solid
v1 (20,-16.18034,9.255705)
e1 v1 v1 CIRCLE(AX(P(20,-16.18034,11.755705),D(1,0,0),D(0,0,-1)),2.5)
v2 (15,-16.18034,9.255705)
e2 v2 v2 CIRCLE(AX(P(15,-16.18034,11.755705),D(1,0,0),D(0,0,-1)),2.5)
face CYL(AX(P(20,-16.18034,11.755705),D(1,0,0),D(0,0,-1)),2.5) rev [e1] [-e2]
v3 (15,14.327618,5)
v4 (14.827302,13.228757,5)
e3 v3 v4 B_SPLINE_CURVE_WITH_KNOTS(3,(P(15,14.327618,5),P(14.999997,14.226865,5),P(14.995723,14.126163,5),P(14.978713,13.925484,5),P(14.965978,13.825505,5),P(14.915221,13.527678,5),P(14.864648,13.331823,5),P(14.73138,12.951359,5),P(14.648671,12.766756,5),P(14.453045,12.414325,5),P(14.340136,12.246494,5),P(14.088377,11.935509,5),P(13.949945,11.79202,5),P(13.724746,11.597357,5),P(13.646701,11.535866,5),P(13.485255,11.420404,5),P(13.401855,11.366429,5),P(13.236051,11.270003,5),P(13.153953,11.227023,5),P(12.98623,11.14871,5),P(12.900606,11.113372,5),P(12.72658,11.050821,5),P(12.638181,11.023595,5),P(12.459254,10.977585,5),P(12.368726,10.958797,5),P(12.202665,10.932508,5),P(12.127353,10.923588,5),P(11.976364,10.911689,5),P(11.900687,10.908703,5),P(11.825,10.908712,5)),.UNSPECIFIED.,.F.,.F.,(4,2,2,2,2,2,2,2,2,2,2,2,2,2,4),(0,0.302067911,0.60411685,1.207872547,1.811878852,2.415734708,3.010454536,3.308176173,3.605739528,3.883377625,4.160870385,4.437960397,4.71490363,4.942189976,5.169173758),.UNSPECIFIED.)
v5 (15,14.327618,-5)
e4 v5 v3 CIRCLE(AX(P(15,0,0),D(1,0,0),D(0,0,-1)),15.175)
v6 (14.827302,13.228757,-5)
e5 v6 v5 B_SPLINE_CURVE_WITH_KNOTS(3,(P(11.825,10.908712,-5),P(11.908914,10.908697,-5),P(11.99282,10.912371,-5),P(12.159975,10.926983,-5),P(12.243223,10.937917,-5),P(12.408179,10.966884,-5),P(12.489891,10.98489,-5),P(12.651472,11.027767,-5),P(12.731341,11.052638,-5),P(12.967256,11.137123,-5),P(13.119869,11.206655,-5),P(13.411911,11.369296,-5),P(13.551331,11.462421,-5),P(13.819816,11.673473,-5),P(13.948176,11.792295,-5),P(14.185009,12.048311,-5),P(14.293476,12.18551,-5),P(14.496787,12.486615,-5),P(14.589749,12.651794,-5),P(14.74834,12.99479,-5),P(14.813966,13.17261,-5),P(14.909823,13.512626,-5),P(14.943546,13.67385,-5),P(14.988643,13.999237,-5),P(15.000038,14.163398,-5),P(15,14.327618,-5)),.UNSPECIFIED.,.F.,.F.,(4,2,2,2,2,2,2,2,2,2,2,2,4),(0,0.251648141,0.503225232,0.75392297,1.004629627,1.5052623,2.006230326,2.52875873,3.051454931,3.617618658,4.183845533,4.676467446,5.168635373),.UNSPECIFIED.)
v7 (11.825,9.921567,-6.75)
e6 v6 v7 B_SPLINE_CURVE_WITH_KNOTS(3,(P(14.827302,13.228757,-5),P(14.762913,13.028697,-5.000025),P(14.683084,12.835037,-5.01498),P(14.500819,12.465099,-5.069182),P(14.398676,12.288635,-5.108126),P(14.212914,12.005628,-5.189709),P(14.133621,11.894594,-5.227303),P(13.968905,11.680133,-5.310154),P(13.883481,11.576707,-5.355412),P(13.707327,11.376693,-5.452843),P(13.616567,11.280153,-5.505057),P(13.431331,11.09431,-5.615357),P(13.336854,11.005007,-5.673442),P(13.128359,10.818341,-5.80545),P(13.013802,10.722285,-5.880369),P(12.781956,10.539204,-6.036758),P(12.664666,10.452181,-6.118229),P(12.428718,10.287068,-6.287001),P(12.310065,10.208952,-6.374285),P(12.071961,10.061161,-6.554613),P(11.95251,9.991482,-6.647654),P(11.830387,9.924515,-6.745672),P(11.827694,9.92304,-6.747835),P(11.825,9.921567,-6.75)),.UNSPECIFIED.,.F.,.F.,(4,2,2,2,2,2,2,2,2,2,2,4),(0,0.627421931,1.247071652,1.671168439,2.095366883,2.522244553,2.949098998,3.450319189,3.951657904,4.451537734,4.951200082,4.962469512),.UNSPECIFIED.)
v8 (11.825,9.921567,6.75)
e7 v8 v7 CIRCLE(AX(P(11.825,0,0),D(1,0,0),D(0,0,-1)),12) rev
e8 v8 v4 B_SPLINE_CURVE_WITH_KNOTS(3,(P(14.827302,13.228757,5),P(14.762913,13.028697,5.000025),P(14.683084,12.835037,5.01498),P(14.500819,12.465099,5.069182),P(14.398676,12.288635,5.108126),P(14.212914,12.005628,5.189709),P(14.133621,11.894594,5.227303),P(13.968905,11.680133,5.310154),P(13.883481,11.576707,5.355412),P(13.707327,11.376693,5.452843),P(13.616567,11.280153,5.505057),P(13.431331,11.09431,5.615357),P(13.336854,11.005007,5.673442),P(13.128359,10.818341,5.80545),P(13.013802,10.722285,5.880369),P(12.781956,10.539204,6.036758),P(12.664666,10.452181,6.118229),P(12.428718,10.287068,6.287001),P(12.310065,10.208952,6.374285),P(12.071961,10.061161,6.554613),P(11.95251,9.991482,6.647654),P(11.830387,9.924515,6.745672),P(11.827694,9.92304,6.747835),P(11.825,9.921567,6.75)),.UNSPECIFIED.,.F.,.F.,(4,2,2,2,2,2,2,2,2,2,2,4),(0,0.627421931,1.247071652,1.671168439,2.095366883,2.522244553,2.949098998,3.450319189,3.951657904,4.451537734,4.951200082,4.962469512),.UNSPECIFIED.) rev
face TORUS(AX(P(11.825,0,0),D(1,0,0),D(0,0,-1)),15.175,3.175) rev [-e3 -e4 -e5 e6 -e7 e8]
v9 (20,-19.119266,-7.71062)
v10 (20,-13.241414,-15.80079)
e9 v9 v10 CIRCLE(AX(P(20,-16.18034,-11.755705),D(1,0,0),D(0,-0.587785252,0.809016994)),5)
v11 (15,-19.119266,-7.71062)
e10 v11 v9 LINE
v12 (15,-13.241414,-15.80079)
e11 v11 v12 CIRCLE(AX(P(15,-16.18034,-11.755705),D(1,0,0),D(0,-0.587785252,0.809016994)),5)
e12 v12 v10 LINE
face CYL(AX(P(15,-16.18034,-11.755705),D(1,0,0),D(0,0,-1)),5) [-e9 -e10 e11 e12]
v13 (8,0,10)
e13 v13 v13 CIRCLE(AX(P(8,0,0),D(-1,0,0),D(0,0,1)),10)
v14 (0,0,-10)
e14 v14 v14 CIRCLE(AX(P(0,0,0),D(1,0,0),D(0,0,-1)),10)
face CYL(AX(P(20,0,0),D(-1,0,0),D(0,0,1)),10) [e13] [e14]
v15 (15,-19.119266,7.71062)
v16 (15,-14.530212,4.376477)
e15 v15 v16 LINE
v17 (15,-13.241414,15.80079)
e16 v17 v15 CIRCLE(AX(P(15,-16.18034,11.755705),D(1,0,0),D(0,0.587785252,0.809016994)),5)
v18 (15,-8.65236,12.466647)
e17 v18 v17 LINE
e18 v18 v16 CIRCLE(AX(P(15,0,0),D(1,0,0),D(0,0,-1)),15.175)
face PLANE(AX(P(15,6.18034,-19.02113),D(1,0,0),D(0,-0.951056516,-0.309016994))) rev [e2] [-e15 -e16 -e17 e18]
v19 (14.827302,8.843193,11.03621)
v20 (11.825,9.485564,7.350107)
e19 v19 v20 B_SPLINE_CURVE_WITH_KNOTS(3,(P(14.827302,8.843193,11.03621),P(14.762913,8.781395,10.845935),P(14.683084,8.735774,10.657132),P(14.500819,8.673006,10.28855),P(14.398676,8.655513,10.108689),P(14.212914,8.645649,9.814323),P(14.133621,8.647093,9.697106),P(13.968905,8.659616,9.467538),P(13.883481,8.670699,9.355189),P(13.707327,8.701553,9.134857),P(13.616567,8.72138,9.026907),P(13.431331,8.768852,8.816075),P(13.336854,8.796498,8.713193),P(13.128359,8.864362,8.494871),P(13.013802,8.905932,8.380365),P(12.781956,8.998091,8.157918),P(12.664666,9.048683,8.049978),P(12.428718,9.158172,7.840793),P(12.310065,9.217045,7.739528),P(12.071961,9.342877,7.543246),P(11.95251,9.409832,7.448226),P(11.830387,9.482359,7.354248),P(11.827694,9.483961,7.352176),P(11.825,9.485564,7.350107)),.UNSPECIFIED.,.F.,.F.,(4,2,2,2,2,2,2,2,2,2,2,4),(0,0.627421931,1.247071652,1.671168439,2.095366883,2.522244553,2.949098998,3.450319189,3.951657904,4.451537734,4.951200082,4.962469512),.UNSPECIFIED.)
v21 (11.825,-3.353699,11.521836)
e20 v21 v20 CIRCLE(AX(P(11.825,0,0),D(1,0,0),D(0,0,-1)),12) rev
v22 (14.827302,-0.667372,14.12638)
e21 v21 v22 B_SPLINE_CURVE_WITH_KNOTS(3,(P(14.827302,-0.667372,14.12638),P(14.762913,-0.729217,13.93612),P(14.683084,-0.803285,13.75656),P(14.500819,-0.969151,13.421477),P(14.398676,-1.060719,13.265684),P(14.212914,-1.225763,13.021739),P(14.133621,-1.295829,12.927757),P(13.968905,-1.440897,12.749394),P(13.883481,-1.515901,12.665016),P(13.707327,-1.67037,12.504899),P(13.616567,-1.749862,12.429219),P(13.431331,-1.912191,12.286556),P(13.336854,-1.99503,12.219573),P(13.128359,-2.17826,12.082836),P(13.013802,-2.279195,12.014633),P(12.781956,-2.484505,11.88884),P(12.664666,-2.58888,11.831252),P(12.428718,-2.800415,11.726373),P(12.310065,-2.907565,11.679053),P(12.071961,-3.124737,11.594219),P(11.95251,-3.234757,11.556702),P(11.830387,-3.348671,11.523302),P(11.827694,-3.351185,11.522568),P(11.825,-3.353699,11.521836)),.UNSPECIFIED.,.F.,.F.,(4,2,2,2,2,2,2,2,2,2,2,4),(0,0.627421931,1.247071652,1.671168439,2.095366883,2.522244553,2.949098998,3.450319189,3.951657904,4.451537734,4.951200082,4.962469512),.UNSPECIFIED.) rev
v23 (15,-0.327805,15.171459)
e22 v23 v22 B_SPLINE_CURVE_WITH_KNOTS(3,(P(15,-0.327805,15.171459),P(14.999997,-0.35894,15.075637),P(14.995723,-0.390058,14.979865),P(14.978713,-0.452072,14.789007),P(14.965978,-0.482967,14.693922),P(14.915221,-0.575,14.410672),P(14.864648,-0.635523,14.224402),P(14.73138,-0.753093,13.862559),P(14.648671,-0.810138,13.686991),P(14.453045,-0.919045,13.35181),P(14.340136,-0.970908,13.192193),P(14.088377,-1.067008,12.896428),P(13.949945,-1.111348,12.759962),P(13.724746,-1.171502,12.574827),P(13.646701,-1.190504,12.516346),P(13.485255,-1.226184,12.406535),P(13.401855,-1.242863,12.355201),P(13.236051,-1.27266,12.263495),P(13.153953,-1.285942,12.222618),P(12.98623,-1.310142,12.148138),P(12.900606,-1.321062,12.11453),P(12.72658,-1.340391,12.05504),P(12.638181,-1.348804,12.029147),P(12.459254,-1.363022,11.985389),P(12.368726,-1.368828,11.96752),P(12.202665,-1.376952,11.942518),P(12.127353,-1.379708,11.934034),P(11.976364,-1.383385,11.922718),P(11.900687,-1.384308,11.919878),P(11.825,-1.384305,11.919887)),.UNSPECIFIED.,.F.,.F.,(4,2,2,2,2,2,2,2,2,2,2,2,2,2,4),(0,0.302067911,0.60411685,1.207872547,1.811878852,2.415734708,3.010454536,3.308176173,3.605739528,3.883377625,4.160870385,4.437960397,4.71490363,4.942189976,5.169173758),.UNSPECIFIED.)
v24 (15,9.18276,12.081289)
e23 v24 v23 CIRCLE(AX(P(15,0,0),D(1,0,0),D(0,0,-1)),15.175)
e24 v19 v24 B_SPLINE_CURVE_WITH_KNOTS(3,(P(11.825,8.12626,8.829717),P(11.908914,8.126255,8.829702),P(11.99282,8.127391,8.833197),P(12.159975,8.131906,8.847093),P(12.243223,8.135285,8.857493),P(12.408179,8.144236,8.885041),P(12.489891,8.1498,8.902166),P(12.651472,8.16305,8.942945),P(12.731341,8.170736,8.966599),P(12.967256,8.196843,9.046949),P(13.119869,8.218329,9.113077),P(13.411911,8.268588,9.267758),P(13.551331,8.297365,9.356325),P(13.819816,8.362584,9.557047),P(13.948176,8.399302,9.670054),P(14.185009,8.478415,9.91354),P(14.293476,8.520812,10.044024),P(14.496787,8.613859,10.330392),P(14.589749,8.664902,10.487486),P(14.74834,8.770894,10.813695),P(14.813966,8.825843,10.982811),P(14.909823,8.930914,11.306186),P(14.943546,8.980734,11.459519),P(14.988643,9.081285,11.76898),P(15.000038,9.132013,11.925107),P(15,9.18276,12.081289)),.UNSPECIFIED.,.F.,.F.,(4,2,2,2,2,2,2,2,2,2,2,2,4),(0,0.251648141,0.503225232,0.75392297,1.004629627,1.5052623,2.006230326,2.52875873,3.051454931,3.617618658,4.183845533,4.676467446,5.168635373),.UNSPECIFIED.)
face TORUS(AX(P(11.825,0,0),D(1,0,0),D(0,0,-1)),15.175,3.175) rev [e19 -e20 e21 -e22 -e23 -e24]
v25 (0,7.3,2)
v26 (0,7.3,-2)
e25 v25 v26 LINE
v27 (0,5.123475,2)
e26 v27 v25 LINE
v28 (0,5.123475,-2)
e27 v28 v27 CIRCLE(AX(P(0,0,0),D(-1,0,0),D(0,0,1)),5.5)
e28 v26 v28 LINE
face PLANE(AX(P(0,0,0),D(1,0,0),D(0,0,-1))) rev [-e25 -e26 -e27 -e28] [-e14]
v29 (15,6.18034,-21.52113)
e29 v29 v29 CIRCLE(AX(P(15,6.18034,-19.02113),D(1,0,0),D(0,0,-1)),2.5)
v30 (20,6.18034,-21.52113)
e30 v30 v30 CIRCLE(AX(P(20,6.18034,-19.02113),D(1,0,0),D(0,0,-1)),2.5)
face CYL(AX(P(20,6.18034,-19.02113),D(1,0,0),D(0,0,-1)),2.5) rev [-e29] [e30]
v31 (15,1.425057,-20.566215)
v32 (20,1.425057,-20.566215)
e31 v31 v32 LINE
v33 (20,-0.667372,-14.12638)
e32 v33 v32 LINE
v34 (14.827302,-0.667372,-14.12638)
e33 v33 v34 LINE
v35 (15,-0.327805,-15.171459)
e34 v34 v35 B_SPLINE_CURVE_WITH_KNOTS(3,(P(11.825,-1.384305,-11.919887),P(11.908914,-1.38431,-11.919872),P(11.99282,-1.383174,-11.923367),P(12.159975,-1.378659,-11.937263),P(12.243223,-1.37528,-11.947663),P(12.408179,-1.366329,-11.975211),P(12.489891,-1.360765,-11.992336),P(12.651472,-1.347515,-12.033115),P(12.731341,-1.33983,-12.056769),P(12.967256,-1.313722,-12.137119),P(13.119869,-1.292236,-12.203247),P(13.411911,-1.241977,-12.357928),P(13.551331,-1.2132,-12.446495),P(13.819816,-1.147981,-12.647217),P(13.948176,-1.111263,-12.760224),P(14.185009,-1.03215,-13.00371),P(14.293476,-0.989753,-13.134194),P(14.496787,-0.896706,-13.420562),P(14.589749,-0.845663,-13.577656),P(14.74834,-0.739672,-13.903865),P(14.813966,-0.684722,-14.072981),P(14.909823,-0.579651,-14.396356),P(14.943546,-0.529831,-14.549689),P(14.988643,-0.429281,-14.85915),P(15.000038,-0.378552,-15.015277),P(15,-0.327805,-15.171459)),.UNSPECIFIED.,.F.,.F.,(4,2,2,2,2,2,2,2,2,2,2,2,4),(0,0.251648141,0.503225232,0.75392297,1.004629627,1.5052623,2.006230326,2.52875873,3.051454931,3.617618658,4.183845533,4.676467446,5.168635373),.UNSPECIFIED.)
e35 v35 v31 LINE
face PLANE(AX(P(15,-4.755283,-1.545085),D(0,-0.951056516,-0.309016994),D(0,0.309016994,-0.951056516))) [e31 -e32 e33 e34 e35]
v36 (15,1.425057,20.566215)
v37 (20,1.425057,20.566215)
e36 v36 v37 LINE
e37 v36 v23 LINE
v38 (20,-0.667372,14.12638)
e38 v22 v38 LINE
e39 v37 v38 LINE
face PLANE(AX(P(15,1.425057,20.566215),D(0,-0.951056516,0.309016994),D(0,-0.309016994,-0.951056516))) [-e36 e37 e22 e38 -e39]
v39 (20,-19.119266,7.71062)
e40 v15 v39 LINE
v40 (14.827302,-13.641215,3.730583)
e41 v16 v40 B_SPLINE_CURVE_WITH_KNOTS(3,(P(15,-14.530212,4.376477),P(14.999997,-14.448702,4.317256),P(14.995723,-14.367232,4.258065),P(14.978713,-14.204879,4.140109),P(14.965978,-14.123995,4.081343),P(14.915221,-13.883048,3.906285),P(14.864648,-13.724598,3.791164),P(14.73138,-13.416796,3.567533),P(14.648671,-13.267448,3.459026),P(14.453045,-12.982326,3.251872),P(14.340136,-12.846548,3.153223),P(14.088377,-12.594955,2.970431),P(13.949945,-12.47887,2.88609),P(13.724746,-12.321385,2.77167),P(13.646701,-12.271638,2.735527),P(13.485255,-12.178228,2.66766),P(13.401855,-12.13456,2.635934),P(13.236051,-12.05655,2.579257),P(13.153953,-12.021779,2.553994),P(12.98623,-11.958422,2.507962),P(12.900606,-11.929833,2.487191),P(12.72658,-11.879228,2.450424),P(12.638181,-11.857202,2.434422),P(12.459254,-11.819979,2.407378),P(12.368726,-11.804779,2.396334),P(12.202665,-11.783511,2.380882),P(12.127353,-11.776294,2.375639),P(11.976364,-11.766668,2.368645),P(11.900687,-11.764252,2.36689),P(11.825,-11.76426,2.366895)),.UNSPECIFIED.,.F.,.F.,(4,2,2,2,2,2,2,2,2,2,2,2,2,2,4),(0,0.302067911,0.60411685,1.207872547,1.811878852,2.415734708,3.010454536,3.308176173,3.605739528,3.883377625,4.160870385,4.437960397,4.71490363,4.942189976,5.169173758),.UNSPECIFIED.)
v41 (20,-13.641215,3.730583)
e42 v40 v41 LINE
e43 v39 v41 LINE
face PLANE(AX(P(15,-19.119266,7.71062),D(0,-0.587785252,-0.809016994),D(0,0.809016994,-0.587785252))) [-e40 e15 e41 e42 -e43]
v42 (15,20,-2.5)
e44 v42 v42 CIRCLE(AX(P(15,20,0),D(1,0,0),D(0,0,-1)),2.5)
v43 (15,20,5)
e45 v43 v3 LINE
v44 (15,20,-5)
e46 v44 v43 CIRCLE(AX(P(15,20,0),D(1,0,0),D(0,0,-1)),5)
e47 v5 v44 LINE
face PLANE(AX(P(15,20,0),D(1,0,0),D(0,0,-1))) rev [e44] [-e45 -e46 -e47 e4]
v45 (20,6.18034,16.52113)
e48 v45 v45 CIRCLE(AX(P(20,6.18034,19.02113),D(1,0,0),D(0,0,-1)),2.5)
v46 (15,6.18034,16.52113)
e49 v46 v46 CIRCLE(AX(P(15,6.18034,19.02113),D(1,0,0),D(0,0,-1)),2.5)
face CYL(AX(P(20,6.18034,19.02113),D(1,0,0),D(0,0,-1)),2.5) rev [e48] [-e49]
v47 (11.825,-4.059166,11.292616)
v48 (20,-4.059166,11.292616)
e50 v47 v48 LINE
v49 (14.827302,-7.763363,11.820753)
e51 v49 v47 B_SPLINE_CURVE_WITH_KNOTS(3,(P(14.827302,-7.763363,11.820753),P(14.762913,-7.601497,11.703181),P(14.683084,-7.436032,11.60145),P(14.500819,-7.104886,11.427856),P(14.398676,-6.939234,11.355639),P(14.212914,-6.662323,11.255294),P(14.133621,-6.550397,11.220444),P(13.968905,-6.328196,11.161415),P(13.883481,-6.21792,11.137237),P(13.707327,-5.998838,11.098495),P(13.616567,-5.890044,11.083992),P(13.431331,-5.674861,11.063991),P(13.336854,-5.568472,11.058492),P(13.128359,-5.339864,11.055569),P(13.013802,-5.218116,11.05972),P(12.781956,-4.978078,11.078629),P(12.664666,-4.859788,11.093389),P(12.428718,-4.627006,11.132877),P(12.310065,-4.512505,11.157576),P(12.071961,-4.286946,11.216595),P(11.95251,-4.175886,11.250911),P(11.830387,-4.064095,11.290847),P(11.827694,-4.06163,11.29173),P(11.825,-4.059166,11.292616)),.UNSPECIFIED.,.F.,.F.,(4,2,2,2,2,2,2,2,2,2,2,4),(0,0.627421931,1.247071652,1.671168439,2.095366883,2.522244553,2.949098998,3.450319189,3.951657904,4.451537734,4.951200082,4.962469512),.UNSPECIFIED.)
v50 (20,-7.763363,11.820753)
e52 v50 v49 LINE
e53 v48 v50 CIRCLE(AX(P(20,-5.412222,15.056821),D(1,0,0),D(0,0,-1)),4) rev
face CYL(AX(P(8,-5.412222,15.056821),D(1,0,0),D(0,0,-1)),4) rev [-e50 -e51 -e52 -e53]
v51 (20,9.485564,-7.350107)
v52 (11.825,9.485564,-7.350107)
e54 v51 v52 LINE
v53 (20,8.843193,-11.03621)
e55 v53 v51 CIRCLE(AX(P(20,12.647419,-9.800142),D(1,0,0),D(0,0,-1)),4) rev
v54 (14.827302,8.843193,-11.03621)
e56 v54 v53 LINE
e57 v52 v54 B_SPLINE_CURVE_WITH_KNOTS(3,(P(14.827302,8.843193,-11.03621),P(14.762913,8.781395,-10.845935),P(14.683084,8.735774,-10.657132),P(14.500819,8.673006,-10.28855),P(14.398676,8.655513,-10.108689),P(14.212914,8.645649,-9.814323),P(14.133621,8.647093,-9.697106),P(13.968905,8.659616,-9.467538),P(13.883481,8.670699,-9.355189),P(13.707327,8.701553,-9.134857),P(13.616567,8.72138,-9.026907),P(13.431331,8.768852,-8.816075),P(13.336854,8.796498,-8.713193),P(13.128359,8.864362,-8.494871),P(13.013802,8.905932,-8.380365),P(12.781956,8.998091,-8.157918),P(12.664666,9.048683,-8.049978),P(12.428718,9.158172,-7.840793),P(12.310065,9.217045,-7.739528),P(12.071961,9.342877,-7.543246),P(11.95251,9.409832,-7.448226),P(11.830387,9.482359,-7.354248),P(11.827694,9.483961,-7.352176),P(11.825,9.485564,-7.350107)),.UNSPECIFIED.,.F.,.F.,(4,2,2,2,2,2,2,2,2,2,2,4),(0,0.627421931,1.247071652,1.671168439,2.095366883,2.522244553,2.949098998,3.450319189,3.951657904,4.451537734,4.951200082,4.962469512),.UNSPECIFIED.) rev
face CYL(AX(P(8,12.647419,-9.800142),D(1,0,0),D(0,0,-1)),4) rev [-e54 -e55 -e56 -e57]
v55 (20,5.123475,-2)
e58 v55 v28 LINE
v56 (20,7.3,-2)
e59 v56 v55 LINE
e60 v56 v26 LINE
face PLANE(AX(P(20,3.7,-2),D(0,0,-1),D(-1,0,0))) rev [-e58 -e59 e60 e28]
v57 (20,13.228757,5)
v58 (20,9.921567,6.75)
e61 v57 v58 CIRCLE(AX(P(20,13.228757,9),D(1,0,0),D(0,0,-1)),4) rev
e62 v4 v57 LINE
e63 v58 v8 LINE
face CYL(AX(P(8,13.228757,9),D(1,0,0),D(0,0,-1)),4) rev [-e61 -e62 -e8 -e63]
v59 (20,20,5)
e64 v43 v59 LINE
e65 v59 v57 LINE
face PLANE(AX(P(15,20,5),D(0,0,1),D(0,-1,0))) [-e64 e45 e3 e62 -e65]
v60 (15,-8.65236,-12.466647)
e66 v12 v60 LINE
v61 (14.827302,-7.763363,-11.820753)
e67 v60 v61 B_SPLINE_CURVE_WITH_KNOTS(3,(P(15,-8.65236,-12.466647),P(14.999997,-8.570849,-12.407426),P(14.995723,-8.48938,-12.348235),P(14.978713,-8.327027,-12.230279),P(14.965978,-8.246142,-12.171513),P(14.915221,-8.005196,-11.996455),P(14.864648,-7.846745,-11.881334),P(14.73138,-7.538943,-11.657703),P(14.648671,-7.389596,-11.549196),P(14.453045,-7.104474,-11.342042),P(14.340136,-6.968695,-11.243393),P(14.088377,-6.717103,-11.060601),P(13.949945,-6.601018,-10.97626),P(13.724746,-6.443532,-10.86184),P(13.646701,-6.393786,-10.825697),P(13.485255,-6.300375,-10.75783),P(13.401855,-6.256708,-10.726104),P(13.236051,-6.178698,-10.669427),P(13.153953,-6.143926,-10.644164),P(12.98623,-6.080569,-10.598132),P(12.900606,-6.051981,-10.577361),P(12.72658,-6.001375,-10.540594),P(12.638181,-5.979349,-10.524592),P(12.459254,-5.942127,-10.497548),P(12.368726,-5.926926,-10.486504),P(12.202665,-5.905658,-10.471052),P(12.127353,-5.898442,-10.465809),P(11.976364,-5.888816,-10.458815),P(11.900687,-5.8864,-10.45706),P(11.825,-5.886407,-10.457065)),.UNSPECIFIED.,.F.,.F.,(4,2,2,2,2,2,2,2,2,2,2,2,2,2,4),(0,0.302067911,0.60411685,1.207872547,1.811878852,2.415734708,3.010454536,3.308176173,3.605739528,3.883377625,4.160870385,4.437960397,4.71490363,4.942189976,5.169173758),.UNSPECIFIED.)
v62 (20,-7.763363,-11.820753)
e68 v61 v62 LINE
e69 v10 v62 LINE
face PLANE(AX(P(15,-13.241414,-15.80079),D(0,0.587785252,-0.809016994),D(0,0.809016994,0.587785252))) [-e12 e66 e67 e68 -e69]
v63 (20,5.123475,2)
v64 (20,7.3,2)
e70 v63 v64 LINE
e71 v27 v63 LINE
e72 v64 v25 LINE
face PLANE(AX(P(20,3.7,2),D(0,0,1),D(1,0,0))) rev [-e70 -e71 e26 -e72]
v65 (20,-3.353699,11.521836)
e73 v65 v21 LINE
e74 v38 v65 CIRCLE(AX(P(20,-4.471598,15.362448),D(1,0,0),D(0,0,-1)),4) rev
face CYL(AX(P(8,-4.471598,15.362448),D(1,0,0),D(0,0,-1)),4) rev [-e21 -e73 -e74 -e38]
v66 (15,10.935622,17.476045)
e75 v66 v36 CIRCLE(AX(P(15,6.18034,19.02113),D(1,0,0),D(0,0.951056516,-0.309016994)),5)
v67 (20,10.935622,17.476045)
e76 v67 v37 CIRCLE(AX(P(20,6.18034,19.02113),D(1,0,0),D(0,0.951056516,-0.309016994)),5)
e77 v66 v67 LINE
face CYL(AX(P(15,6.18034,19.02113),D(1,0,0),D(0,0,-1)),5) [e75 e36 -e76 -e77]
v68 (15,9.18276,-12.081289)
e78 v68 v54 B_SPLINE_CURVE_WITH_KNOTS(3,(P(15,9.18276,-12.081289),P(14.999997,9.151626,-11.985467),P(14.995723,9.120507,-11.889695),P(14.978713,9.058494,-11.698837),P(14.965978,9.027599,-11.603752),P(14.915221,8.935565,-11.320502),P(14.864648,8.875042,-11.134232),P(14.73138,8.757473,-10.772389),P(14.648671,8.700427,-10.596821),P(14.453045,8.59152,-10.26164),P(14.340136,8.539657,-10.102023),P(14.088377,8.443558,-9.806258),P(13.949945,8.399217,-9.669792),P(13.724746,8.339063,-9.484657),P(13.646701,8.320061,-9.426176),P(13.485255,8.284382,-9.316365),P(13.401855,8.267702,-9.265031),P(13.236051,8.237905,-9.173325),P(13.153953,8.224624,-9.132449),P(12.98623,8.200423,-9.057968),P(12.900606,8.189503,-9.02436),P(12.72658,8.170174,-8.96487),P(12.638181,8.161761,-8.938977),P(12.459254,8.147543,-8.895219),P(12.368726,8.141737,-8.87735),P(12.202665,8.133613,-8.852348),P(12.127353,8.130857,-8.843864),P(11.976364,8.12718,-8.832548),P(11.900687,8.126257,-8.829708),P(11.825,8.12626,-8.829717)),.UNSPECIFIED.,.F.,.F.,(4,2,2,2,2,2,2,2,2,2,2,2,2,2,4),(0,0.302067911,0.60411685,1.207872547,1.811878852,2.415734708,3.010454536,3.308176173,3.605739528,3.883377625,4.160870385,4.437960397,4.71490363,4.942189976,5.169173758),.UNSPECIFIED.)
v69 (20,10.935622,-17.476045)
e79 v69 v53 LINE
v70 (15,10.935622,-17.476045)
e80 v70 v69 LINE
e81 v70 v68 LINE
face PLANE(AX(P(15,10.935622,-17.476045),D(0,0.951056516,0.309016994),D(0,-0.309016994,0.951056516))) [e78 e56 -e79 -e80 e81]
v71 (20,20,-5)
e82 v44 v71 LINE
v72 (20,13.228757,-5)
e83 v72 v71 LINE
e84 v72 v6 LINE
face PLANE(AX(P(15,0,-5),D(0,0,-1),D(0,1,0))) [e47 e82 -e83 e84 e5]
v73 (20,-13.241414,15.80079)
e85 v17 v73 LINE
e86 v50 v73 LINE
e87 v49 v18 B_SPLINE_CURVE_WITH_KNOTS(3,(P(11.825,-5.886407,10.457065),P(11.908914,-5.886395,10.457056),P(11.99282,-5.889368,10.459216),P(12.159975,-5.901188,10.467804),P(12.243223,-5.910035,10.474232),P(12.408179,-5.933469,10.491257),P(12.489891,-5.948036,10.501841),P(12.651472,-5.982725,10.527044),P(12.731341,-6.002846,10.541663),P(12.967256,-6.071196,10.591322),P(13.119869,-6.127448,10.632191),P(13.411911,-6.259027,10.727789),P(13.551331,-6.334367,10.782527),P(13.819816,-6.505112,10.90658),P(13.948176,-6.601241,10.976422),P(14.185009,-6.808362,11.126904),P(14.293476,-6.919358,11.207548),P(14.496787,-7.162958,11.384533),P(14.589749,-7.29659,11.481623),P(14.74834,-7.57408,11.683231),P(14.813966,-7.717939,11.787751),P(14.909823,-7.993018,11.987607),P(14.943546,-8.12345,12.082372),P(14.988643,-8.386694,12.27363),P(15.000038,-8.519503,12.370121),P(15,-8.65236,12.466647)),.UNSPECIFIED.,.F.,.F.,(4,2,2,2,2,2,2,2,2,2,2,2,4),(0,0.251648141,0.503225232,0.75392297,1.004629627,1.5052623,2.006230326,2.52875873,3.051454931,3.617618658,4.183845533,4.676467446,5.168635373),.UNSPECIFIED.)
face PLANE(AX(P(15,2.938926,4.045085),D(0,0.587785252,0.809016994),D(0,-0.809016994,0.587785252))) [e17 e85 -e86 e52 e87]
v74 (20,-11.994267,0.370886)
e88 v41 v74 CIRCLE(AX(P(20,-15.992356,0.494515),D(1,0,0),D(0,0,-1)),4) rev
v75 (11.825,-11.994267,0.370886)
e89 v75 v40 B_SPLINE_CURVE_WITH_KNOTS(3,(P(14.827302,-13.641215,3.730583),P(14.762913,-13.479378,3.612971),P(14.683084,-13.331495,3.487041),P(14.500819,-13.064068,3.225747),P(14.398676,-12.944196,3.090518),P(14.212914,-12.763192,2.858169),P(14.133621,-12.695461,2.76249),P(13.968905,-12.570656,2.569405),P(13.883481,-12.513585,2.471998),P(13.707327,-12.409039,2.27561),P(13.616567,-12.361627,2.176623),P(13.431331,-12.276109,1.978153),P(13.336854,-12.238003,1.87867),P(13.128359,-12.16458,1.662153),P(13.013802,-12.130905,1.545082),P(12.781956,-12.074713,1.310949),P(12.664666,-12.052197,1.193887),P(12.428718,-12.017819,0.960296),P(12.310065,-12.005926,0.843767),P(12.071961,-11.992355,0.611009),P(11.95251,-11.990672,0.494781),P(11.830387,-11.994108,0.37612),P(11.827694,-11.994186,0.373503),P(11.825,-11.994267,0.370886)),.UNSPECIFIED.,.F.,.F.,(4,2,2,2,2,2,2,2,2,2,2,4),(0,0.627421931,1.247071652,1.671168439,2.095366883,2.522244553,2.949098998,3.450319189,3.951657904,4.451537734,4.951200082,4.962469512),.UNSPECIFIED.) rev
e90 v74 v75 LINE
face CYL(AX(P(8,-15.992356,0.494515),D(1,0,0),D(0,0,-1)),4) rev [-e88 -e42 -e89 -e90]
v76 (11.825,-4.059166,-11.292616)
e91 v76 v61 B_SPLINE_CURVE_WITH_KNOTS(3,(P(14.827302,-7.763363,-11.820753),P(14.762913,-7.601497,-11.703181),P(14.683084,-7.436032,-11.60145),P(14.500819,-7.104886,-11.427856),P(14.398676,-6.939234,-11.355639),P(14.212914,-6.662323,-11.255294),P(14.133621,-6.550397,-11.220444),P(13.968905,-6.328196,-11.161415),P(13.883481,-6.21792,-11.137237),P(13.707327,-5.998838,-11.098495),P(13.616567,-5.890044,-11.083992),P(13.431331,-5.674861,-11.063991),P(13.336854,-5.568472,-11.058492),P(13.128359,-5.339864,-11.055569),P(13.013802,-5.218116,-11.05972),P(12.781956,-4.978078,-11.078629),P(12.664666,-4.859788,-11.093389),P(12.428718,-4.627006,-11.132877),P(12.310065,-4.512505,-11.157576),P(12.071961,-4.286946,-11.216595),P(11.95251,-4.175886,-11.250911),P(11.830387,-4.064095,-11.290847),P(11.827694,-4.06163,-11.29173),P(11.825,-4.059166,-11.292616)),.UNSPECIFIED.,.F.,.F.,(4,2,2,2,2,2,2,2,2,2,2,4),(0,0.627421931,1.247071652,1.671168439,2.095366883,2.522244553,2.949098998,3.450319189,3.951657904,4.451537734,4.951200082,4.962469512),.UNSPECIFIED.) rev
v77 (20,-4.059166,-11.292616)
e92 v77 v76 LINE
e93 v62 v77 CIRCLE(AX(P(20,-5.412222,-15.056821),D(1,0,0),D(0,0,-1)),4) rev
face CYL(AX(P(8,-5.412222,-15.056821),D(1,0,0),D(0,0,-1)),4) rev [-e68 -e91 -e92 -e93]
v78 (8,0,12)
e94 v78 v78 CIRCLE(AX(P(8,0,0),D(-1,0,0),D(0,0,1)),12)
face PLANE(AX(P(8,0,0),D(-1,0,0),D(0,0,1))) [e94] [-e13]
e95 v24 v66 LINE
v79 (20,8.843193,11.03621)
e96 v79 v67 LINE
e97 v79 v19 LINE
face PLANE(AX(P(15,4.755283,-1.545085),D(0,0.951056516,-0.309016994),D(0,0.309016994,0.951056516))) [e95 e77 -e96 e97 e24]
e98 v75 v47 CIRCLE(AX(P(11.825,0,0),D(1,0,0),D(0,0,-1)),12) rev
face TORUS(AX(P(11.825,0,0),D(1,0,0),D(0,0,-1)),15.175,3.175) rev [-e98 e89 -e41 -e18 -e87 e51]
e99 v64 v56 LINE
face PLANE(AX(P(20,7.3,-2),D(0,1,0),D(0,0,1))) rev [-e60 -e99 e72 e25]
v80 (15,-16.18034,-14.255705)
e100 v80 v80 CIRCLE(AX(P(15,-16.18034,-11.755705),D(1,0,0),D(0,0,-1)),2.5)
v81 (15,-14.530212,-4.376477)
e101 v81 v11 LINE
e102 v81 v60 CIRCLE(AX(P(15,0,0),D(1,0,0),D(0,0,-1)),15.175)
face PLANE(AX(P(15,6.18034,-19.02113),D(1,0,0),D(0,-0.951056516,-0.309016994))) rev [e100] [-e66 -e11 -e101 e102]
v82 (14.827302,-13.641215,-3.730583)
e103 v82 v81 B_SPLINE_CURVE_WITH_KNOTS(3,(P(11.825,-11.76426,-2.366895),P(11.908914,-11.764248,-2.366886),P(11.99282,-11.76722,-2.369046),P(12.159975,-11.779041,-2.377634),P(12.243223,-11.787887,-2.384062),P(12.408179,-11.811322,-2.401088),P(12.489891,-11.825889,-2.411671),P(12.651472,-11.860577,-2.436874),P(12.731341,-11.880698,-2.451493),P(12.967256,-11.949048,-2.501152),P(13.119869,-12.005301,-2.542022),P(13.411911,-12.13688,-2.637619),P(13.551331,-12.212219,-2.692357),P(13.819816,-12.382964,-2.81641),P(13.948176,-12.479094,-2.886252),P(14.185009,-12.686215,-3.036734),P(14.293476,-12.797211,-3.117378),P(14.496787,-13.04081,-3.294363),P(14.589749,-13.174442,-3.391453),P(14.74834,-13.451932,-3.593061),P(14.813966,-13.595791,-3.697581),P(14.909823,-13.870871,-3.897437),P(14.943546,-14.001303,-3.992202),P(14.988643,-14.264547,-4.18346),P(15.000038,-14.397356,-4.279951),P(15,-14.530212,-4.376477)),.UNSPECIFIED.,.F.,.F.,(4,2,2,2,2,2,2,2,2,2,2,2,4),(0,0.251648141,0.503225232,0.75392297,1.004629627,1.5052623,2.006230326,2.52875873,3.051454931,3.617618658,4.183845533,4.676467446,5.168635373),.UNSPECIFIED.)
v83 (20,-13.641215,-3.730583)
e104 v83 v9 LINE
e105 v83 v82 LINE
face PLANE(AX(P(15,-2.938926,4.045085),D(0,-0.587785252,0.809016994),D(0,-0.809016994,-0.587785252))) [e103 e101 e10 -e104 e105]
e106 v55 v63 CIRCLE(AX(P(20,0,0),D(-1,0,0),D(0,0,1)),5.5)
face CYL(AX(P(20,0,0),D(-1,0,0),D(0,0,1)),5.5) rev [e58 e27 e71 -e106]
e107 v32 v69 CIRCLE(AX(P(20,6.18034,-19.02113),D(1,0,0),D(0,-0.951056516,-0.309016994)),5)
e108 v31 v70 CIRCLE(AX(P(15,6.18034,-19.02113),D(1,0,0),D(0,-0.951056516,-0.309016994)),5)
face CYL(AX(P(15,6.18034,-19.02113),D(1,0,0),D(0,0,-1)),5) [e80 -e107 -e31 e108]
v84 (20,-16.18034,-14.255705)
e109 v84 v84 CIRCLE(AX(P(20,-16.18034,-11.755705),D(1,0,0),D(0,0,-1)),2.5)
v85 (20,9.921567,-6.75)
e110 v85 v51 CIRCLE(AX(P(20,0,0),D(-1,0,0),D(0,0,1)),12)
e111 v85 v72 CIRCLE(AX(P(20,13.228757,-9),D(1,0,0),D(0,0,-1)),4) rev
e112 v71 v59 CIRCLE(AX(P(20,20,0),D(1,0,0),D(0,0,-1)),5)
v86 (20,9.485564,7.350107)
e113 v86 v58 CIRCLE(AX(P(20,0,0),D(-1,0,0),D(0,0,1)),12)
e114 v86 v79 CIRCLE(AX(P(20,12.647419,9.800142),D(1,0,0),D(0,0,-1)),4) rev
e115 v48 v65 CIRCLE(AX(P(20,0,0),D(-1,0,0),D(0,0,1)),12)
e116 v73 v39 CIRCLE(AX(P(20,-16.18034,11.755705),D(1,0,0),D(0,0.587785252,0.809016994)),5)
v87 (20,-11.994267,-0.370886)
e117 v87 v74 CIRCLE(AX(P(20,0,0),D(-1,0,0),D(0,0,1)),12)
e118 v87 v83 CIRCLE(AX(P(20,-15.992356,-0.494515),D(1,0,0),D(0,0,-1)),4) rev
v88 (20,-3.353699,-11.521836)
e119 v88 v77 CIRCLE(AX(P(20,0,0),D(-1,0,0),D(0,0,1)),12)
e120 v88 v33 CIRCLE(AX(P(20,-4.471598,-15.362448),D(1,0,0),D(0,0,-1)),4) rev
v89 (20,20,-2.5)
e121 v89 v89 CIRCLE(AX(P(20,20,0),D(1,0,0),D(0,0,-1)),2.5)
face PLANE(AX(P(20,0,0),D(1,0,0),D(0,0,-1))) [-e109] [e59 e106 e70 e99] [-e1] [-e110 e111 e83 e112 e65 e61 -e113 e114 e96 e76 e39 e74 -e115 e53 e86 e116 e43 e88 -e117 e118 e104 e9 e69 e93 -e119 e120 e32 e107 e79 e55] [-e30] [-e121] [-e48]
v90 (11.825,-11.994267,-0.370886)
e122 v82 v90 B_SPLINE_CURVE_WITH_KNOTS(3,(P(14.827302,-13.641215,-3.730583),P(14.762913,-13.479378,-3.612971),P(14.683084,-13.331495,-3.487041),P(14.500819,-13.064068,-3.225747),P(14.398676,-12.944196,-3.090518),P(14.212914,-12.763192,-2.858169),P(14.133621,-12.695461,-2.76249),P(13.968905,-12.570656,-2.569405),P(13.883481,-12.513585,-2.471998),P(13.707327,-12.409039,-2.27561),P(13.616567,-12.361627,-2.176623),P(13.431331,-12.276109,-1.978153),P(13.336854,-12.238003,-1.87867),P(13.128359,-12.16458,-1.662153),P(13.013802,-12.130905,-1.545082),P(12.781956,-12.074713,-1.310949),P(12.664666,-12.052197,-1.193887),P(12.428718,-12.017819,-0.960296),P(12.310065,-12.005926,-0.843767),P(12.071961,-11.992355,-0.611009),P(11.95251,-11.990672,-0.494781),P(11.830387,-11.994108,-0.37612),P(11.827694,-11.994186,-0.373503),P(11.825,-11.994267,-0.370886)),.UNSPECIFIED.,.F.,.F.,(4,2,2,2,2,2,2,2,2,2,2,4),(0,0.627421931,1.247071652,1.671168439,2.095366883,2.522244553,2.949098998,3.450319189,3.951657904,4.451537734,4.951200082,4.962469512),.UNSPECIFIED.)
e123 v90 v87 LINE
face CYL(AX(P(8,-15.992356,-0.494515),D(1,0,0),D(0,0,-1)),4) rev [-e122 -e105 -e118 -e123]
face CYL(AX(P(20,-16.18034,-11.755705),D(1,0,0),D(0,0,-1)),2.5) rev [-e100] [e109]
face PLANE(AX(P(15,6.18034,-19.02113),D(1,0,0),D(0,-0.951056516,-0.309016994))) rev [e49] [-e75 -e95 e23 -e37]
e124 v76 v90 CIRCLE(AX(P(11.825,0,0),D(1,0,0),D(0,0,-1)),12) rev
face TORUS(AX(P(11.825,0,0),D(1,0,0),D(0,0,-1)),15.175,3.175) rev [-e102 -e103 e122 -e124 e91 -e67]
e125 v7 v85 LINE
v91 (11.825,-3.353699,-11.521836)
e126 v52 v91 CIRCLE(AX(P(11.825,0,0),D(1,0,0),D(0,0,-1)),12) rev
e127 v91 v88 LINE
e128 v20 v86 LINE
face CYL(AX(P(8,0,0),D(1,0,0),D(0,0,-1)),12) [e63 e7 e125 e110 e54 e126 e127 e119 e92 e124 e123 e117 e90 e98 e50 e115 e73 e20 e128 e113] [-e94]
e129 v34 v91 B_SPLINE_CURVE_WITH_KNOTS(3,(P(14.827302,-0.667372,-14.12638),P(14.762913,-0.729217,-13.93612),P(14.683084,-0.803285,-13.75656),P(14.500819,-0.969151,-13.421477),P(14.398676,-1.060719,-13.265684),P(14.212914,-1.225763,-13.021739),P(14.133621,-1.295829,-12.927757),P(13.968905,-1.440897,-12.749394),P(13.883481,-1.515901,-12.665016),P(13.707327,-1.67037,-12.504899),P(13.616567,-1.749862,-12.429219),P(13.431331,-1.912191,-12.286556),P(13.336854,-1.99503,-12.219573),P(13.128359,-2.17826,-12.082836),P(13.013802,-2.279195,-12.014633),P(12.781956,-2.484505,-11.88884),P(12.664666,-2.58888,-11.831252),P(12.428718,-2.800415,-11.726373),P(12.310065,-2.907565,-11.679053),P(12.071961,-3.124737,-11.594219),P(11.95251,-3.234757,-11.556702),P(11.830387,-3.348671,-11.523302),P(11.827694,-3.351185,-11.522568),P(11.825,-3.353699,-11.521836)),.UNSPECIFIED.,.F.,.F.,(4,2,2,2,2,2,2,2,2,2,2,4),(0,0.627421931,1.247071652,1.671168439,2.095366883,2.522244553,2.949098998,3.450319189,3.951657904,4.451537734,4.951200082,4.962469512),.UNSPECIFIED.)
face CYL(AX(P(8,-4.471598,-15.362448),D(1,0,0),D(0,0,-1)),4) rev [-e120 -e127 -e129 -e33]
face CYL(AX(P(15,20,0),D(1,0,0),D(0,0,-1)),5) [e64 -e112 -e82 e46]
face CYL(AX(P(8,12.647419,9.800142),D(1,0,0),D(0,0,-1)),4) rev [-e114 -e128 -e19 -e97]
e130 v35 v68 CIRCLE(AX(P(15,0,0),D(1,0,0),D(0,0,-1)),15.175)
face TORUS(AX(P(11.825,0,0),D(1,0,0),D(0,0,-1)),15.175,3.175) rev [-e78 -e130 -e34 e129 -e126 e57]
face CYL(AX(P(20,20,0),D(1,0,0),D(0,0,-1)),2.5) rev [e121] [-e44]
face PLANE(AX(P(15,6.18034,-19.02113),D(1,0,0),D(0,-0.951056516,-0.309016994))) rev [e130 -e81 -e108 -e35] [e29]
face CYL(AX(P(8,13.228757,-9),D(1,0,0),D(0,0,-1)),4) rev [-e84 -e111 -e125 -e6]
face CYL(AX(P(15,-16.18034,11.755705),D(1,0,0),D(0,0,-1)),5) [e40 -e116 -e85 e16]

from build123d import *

# Parameters (mm, degrees)
SKETCH1_R                = 10
BOSS_EXTRUDE2_DEPTH      = 20
SKETCH5_R                = 12
BOSS_EXTRUDE3_DEPTH      = 12
BOSS_EXTRUDE4_DEPTH      = 5
FILLET2_R                = 3.175
F_5_0_5_DIAMETER_HOLE1_D = 5
FILLET1_START            = 15.0000001
FILLET1_DEPTH            = 4.9999999
FILLET1_START_2          = 11.8249999
FILLET1_2_DEPTH          = 3.1750001
CIRPATTERN6_START        = 11.8249999
CIRPATTERN6_OUTLINE_R    = 2.5
CIRPATTERN6_DEPTH        = 8.1750001
SKETCH2_R                = 5.5
SHAFT_HOLE_DEPTH         = 41.025175904
SKETCH3_W                = 4
SKETCH3_H                = 3.6
KEYWAY_DEPTH             = 41.025175904


with BuildPart() as part:
    # Sketch1 → Boss-Extrude2 (new body)
    with BuildSketch(Plane(origin=(0, 0, 0), x_dir=(0, 0, -1), z_dir=(1, 0, 0))):
        Circle(SKETCH1_R)
    extrude(amount=BOSS_EXTRUDE2_DEPTH)

    # Sketch5 → Boss-Extrude3 (add)
    with BuildSketch(Plane.ZY.offset(-20)):
        Circle(SKETCH5_R)
    extrude(amount=BOSS_EXTRUDE3_DEPTH)

    # Sketch6 → Boss-Extrude4 (add)
    with BuildSketch(Plane(origin=(20, 0, 0), x_dir=(0, 0, -1), z_dir=(1, 0, 0))):
        with BuildLine():
            Line((-5, 20), (-5, 0))
            Line((-5, 0), (5, 0))
            Line((5, 0), (5, 20))
            ThreePointArc((5, 20), (0, 25), (-5, 20))
        make_face()
    extrude(amount=-BOSS_EXTRUDE4_DEPTH)

    # Fillet2
    fillet2_edges = [part.edges().sort_by_distance(p)[0] for p in [
        (15, 12, 0),
    ]]
    fillet(fillet2_edges, radius=FILLET2_R)

    # Ø5.0 (5) Diameter Hole1 (through all)
    with Locations(Plane(origin=(20, 0, 0), x_dir=(0, 0, -1), z_dir=(1, 0, 0))):
        with Locations((0, 20)):
            Hole(F_5_0_5_DIAMETER_HOLE1_D / 2)

    # Fillet1: read off the stored shape, not the designer's step
    # Fillet1 outline → Fillet1 (add)
    with BuildSketch(Plane.YZ.offset(FILLET1_START)):
        with BuildLine():
            ThreePointArc((9.921567416, -6.75), (11.357927862, -5.464466094), (13.228756555, -5))
            Line((13.228756555, -5), (10.908712115, -5))
            ThreePointArc((10.908712115, -5), (10.451830526, -5.895696622), (9.921567416, -6.75))
        make_face()
        with BuildLine():
            ThreePointArc((13.228756555, 5), (11.357927862, 5.464466094), (9.921567416, 6.75))
            ThreePointArc((9.921567416, 6.75), (10.451830526, 5.895696622), (10.908712115, 5))
            Line((10.908712115, 5), (13.228756555, 5))
        make_face()
    extrude(amount=FILLET1_DEPTH)

    # Fillet1 2 outline → Fillet1 2 (add)
    with BuildSketch(Plane.YZ.offset(FILLET1_START_2)):
        with BuildLine():
            ThreePointArc((9.921567416, -6.75), (11.357927862, -5.464466094), (13.228756555, -5))
            Line((13.228756555, -5), (10.908712115, -5))
            ThreePointArc((10.908712115, -5), (10.451830526, -5.895696622), (9.921567416, -6.75))
        make_face()
        with BuildLine():
            ThreePointArc((13.228756555, 5), (11.357927862, 5.464466094), (9.921567416, 6.75))
            ThreePointArc((9.921567416, 6.75), (10.451830526, 5.895696622), (10.908712115, 5))
            Line((10.908712115, 5), (13.228756555, 5))
        make_face()
    extrude(amount=FILLET1_2_DEPTH)

    # Fillet1 3 outline → Fillet1 3 (revolve, cut)
    with BuildSketch(Plane.YX):
        with BuildLine():
            Line((15.175, 11.8249999), (15.175, 15))
            ThreePointArc((15.175, 15), (12.92993597, 14.07006403), (12, 11.825))
            Line((12, 11.825), (15.175, 11.8249999))
        make_face()
    revolve(axis=Axis((0, 0, 0), (1, 0, 0)), mode=Mode.SUBTRACT)

    # CirPattern6: read off the stored shape, not the designer's step
    # CirPattern6 outline → CirPattern6 (add)
    # profile 1 of 4: a face of its own
    with BuildSketch(Plane.YZ.offset(CIRPATTERN6_START)):
        with BuildLine():
            Line((8.843193172, 11.036210153), (10.935622469, 17.476045354))
            ThreePointArc((10.935622469, 17.476045354), (7.725424859, 23.776412907), (1.425057306, 20.566215298))
            Line((1.425057306, 20.566215298), (-0.667371991, 14.126380096))
            ThreePointArc((-0.667371991, 14.126380096), (-1.687223357, 12.490644193), (-3.353698542, 11.521836055))
            ThreePointArc((-3.353698542, 11.521836055), (3.708203933, 11.412678195), (9.485564428, 7.350106631))
            ThreePointArc((9.485564428, 7.350106631), (8.706808817, 9.113418416), (8.843193172, 11.036210153))
        make_face()
        with Locations((6.180339887, 19.021130326)):
            Circle(CIRPATTERN6_OUTLINE_R, mode=Mode.SUBTRACT)
    # profile 2 of 4: a face of its own
    with BuildSketch(Plane.YZ.offset(CIRPATTERN6_START)):
        with BuildLine():
            ThreePointArc((-11.994267104, 0.370886295), (-9.708203933, 7.053423027), (-4.059166198, 11.292615719))
            ThreePointArc((-4.059166198, 11.292615719), (-5.976824079, 11.096868429), (-7.763362606, 11.820752981))
            Line((-7.763362606, 11.820752981), (-13.241413626, 15.800790018))
            ThreePointArc((-13.241413626, 15.800790018), (-20.225424859, 14.694631307), (-19.119266149, 7.710620074))
            Line((-19.119266149, 7.710620074), (-13.641215129, 3.730583038))
            ThreePointArc((-13.641215129, 3.730583038), (-12.400689243, 2.255176559), (-11.994267104, 0.370886295))
        make_face()
        with Locations((-16.180339887, 11.755705046)):
            Circle(CIRPATTERN6_OUTLINE_R, mode=Mode.SUBTRACT)
    # profile 3 of 4: a face of its own
    with BuildSketch(Plane.YZ.offset(CIRPATTERN6_START)):
        with BuildLine():
            ThreePointArc((8.843193172, -11.036210153), (8.706808817, -9.113418416), (9.485564428, -7.350106631))
            ThreePointArc((9.485564428, -7.350106631), (3.708203933, -11.412678195), (-3.353698542, -11.521836055))
            ThreePointArc((-3.353698542, -11.521836055), (-1.687223357, -12.490644193), (-0.667371991, -14.126380096))
            Line((-0.667371991, -14.126380096), (1.425057306, -20.566215298))
            ThreePointArc((1.425057306, -20.566215298), (7.725424859, -23.776412907), (10.935622469, -17.476045354))
            Line((10.935622469, -17.476045354), (8.843193172, -11.036210153))
        make_face()
        with Locations((6.180339887, -19.021130326)):
            Circle(CIRPATTERN6_OUTLINE_R, mode=Mode.SUBTRACT)
    # profile 4 of 4: a face of its own
    with BuildSketch(Plane.YZ.offset(CIRPATTERN6_START)):
        with BuildLine():
            ThreePointArc((-4.059166198, -11.292615719), (-9.708203933, -7.053423027), (-11.994267104, -0.370886295))
            ThreePointArc((-11.994267104, -0.370886295), (-12.400689243, -2.255176559), (-13.641215129, -3.730583038))
            Line((-13.641215129, -3.730583038), (-19.119266149, -7.710620074))
            ThreePointArc((-19.119266149, -7.710620074), (-20.225424859, -14.694631307), (-13.241413626, -15.800790018))
            Line((-13.241413626, -15.800790018), (-7.763362606, -11.820752981))
            ThreePointArc((-7.763362606, -11.820752981), (-5.976824079, -11.096868429), (-4.059166198, -11.292615719))
        make_face()
        with Locations((-16.180339887, -11.755705046)):
            Circle(CIRPATTERN6_OUTLINE_R, mode=Mode.SUBTRACT)
    extrude(amount=CIRPATTERN6_DEPTH)

    # CirPattern6 2 outline → CirPattern6 2 (revolve, cut)
    with BuildSketch(Plane.YX):
        with BuildLine():
            Line((25, 15), (15.175, 15))
            ThreePointArc((15.175, 15), (12.92993597, 14.07006403), (12, 11.825))
            Line((12, 11.825), (25, 11.8249999))
            Line((25, 11.8249999), (25, 15))
        make_face()
    revolve(axis=Axis((0, 0, 0), (1, 0, 0)), mode=Mode.SUBTRACT)

    # Sketch2 → Shaft hole (cut, through all)
    with BuildSketch(Plane.ZY):
        Circle(SKETCH2_R)
    extrude(amount=-SHAFT_HOLE_DEPTH, mode=Mode.SUBTRACT)

    # Sketch3 → Keyway (cut, through all)
    with BuildSketch(Plane.ZY):
        with Locations((0, 5.5)):
            Rectangle(SKETCH3_W, SKETCH3_H)
    extrude(amount=-KEYWAY_DEPTH, mode=Mode.SUBTRACT)


solid = part.part
